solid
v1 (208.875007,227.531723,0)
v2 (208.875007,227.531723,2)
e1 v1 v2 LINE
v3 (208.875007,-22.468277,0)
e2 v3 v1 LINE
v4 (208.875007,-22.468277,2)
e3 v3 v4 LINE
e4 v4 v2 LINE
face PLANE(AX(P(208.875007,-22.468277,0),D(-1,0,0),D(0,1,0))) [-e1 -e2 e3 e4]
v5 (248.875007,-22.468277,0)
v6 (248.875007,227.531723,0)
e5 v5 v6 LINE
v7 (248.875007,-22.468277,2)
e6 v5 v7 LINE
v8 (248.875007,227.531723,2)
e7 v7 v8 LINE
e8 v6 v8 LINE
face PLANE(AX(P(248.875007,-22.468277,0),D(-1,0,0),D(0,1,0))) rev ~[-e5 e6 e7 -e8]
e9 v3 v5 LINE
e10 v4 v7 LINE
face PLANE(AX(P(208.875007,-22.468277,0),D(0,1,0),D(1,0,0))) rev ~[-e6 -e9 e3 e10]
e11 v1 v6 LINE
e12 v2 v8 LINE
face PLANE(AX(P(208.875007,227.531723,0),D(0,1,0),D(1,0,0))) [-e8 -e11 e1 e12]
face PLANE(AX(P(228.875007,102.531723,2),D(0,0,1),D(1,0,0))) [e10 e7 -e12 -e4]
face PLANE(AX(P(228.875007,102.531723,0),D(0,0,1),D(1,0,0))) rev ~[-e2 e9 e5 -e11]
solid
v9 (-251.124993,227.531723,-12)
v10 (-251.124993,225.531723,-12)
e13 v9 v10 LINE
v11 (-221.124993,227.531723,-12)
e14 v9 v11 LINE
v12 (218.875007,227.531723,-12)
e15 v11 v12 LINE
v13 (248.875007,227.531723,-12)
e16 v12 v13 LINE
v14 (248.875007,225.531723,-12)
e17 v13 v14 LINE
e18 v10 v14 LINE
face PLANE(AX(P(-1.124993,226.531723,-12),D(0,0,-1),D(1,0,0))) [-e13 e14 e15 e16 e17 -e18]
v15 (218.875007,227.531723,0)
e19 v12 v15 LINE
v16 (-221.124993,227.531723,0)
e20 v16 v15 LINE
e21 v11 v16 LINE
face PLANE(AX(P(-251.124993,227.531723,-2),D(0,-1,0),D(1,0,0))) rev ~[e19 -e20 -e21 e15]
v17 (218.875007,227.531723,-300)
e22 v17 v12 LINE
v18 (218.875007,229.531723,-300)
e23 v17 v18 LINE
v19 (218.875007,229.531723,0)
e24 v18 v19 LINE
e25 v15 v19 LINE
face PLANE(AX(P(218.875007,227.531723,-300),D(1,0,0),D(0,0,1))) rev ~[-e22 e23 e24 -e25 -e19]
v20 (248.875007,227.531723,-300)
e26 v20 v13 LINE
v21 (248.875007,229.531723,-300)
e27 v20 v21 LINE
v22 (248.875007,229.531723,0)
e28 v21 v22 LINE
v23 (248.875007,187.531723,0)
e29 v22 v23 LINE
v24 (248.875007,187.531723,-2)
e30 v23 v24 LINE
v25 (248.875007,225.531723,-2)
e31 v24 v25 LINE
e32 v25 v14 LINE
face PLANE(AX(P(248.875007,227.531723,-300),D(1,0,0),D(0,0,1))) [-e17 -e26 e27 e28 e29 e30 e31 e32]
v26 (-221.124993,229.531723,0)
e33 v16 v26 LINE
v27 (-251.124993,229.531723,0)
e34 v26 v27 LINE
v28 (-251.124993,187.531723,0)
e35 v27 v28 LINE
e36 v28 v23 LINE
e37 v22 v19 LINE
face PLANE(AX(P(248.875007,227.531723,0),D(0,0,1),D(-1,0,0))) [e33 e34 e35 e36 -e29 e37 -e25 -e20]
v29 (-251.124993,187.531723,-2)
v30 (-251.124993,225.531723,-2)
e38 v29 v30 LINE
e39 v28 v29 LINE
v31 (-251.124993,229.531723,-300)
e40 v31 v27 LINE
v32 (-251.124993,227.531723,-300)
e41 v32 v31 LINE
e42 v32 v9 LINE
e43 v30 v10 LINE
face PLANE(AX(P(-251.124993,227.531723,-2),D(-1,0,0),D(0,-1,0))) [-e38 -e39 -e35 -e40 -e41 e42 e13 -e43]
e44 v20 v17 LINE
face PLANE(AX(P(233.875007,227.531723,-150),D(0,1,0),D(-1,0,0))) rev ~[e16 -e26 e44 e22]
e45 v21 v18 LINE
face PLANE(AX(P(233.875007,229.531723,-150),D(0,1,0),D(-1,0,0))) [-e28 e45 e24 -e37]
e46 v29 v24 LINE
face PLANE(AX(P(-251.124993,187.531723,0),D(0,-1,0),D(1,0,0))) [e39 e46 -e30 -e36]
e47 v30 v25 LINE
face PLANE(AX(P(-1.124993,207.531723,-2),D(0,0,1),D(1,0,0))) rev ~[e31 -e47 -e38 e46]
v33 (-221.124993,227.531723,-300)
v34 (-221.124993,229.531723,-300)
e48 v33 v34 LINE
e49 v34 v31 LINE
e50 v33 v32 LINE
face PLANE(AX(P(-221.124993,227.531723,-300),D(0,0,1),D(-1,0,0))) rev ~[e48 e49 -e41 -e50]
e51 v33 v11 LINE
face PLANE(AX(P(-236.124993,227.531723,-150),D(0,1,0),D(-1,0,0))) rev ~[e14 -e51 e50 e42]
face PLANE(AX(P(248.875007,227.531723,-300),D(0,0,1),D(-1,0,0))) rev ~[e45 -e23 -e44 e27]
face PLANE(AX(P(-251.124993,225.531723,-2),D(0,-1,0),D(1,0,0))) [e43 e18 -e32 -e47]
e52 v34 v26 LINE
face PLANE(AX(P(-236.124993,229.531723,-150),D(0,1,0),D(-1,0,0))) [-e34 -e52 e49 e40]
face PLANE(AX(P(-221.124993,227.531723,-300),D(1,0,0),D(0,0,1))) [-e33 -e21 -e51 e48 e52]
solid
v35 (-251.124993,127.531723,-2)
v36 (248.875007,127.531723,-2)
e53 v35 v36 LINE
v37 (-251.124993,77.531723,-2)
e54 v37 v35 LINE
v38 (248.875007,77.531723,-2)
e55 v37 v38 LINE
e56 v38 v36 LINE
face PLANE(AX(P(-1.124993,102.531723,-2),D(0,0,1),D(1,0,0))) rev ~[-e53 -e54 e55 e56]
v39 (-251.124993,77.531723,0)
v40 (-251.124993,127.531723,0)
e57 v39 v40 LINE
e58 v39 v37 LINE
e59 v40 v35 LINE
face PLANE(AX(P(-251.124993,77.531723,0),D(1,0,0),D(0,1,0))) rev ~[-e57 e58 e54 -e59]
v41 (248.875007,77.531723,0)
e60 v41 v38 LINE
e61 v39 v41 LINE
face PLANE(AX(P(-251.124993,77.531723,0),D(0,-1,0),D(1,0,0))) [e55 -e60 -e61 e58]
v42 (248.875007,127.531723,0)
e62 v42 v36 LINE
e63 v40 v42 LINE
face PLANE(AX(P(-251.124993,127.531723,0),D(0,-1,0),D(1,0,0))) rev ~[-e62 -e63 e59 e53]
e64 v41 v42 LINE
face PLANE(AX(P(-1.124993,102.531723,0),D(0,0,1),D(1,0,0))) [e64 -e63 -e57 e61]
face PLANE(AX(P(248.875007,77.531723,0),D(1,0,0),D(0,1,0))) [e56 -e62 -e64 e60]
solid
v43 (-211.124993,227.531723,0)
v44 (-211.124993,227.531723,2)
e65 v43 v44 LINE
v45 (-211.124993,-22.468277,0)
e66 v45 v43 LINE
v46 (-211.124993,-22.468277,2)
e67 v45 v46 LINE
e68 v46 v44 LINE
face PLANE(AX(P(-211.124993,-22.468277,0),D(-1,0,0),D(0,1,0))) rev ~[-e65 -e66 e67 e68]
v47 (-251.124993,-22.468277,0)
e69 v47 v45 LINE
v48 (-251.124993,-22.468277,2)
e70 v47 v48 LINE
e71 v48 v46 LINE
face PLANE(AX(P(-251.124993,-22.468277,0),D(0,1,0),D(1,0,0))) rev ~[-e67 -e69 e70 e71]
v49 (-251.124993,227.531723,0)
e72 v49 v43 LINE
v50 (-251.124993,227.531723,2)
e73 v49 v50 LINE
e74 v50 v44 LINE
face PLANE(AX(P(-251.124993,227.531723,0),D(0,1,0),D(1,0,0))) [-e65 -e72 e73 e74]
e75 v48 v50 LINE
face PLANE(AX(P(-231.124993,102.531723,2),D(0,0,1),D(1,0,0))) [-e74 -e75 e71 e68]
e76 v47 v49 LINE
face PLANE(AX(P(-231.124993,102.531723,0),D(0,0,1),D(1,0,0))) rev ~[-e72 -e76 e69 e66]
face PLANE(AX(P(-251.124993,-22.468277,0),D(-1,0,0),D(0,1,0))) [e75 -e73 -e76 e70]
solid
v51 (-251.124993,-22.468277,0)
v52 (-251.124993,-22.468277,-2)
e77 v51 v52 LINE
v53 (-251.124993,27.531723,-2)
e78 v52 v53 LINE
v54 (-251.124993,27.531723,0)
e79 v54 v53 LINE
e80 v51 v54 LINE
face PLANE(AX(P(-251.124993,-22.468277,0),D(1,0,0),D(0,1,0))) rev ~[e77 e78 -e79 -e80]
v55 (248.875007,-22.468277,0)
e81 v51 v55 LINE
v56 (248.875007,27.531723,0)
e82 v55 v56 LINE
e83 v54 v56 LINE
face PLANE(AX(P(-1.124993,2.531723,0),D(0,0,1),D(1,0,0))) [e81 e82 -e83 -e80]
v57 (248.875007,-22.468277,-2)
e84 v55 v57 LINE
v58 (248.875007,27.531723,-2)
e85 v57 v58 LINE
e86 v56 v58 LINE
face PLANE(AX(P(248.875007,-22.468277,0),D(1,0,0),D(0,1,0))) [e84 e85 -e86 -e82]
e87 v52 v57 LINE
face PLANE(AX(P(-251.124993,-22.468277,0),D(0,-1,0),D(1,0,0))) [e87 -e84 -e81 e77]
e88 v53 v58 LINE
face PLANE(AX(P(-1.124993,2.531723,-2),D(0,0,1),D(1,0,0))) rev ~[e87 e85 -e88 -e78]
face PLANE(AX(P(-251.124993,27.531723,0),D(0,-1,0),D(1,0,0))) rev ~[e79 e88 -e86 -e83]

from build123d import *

# Parameters (mm, degrees)
F0_W      = 500
F0_H      = 40
F1_DEPTH  = 2
F2_W      = 40
F2_H      = 250
F3_DEPTH  = 2
F4_W      = 500
F4_H      = 50
F5_DEPTH  = 2
F7_W      = 500
F7_H      = 2
F8_DEPTH  = 10
F9_W      = 30
F9_H      = 300
F10_DEPTH = 2


# Not quite as in the source:
# - a feature names something its author has since deleted; it is built from what else it names


with BuildPart() as f1:
    # F0 (on Top) → F1 (new body)
    with BuildSketch(Plane.XY):
        with Locations((-1.1249929667, 207.531722784)):
            Rectangle(F0_W, F0_H)
    extrude(amount=-F1_DEPTH)

    # F7 (on face) → F8 (join)
    with BuildSketch(Plane(origin=(0, 0, -2), x_dir=(1, 0, 0), z_dir=(0, 0, -1))):
        with Locations((-1.1249929667, -226.531722784)):
            Rectangle(F7_W, F7_H)
    extrude(amount=F8_DEPTH)

    # F9 (on face) → F10 (join)
    with BuildSketch(Plane(origin=(0, 227.531722784, 0), x_dir=(-1, 0, 0), z_dir=(0, 1, 0))):
        with Locations((-233.8750070333, -150)):
            Rectangle(F9_W, F9_H)
        with Locations((236.1249929667, -150)):
            Rectangle(F9_W, F9_H)
    extrude(amount=F10_DEPTH)


with BuildPart() as f3:
    # F2 (on Top) → F3 (new body)
    with BuildSketch(Plane.XY):
        with Locations((-231.1249929667, 102.531722784)):
            Rectangle(F2_W, F2_H)
    extrude(amount=F3_DEPTH)


with BuildPart() as f3b:
    # F2 (on Top) → F3, piece 2 (new body)
    with BuildSketch(Plane.XY):
        with Locations((228.8750070333, 102.531722784)):
            Rectangle(F2_W, F2_H)
    extrude(amount=F3_DEPTH)


with BuildPart() as f5:
    # F4 (on Top) → F5 (new body)
    with BuildSketch(Plane.XY):
        with Locations((-1.1249929667, 2.531722784)):
            Rectangle(F4_W, F4_H)
    extrude(amount=-F5_DEPTH)


with BuildPart() as f5b:
    # F4 (on Top) → F5, piece 2 (new body)
    with BuildSketch(Plane.XY):
        with Locations((-1.1249929667, 102.531722784)):
            Rectangle(F4_W, F4_H)
    extrude(amount=-F5_DEPTH)


solid = Compound([f1.part, f3.part, f3b.part, f5.part, f5b.part])
